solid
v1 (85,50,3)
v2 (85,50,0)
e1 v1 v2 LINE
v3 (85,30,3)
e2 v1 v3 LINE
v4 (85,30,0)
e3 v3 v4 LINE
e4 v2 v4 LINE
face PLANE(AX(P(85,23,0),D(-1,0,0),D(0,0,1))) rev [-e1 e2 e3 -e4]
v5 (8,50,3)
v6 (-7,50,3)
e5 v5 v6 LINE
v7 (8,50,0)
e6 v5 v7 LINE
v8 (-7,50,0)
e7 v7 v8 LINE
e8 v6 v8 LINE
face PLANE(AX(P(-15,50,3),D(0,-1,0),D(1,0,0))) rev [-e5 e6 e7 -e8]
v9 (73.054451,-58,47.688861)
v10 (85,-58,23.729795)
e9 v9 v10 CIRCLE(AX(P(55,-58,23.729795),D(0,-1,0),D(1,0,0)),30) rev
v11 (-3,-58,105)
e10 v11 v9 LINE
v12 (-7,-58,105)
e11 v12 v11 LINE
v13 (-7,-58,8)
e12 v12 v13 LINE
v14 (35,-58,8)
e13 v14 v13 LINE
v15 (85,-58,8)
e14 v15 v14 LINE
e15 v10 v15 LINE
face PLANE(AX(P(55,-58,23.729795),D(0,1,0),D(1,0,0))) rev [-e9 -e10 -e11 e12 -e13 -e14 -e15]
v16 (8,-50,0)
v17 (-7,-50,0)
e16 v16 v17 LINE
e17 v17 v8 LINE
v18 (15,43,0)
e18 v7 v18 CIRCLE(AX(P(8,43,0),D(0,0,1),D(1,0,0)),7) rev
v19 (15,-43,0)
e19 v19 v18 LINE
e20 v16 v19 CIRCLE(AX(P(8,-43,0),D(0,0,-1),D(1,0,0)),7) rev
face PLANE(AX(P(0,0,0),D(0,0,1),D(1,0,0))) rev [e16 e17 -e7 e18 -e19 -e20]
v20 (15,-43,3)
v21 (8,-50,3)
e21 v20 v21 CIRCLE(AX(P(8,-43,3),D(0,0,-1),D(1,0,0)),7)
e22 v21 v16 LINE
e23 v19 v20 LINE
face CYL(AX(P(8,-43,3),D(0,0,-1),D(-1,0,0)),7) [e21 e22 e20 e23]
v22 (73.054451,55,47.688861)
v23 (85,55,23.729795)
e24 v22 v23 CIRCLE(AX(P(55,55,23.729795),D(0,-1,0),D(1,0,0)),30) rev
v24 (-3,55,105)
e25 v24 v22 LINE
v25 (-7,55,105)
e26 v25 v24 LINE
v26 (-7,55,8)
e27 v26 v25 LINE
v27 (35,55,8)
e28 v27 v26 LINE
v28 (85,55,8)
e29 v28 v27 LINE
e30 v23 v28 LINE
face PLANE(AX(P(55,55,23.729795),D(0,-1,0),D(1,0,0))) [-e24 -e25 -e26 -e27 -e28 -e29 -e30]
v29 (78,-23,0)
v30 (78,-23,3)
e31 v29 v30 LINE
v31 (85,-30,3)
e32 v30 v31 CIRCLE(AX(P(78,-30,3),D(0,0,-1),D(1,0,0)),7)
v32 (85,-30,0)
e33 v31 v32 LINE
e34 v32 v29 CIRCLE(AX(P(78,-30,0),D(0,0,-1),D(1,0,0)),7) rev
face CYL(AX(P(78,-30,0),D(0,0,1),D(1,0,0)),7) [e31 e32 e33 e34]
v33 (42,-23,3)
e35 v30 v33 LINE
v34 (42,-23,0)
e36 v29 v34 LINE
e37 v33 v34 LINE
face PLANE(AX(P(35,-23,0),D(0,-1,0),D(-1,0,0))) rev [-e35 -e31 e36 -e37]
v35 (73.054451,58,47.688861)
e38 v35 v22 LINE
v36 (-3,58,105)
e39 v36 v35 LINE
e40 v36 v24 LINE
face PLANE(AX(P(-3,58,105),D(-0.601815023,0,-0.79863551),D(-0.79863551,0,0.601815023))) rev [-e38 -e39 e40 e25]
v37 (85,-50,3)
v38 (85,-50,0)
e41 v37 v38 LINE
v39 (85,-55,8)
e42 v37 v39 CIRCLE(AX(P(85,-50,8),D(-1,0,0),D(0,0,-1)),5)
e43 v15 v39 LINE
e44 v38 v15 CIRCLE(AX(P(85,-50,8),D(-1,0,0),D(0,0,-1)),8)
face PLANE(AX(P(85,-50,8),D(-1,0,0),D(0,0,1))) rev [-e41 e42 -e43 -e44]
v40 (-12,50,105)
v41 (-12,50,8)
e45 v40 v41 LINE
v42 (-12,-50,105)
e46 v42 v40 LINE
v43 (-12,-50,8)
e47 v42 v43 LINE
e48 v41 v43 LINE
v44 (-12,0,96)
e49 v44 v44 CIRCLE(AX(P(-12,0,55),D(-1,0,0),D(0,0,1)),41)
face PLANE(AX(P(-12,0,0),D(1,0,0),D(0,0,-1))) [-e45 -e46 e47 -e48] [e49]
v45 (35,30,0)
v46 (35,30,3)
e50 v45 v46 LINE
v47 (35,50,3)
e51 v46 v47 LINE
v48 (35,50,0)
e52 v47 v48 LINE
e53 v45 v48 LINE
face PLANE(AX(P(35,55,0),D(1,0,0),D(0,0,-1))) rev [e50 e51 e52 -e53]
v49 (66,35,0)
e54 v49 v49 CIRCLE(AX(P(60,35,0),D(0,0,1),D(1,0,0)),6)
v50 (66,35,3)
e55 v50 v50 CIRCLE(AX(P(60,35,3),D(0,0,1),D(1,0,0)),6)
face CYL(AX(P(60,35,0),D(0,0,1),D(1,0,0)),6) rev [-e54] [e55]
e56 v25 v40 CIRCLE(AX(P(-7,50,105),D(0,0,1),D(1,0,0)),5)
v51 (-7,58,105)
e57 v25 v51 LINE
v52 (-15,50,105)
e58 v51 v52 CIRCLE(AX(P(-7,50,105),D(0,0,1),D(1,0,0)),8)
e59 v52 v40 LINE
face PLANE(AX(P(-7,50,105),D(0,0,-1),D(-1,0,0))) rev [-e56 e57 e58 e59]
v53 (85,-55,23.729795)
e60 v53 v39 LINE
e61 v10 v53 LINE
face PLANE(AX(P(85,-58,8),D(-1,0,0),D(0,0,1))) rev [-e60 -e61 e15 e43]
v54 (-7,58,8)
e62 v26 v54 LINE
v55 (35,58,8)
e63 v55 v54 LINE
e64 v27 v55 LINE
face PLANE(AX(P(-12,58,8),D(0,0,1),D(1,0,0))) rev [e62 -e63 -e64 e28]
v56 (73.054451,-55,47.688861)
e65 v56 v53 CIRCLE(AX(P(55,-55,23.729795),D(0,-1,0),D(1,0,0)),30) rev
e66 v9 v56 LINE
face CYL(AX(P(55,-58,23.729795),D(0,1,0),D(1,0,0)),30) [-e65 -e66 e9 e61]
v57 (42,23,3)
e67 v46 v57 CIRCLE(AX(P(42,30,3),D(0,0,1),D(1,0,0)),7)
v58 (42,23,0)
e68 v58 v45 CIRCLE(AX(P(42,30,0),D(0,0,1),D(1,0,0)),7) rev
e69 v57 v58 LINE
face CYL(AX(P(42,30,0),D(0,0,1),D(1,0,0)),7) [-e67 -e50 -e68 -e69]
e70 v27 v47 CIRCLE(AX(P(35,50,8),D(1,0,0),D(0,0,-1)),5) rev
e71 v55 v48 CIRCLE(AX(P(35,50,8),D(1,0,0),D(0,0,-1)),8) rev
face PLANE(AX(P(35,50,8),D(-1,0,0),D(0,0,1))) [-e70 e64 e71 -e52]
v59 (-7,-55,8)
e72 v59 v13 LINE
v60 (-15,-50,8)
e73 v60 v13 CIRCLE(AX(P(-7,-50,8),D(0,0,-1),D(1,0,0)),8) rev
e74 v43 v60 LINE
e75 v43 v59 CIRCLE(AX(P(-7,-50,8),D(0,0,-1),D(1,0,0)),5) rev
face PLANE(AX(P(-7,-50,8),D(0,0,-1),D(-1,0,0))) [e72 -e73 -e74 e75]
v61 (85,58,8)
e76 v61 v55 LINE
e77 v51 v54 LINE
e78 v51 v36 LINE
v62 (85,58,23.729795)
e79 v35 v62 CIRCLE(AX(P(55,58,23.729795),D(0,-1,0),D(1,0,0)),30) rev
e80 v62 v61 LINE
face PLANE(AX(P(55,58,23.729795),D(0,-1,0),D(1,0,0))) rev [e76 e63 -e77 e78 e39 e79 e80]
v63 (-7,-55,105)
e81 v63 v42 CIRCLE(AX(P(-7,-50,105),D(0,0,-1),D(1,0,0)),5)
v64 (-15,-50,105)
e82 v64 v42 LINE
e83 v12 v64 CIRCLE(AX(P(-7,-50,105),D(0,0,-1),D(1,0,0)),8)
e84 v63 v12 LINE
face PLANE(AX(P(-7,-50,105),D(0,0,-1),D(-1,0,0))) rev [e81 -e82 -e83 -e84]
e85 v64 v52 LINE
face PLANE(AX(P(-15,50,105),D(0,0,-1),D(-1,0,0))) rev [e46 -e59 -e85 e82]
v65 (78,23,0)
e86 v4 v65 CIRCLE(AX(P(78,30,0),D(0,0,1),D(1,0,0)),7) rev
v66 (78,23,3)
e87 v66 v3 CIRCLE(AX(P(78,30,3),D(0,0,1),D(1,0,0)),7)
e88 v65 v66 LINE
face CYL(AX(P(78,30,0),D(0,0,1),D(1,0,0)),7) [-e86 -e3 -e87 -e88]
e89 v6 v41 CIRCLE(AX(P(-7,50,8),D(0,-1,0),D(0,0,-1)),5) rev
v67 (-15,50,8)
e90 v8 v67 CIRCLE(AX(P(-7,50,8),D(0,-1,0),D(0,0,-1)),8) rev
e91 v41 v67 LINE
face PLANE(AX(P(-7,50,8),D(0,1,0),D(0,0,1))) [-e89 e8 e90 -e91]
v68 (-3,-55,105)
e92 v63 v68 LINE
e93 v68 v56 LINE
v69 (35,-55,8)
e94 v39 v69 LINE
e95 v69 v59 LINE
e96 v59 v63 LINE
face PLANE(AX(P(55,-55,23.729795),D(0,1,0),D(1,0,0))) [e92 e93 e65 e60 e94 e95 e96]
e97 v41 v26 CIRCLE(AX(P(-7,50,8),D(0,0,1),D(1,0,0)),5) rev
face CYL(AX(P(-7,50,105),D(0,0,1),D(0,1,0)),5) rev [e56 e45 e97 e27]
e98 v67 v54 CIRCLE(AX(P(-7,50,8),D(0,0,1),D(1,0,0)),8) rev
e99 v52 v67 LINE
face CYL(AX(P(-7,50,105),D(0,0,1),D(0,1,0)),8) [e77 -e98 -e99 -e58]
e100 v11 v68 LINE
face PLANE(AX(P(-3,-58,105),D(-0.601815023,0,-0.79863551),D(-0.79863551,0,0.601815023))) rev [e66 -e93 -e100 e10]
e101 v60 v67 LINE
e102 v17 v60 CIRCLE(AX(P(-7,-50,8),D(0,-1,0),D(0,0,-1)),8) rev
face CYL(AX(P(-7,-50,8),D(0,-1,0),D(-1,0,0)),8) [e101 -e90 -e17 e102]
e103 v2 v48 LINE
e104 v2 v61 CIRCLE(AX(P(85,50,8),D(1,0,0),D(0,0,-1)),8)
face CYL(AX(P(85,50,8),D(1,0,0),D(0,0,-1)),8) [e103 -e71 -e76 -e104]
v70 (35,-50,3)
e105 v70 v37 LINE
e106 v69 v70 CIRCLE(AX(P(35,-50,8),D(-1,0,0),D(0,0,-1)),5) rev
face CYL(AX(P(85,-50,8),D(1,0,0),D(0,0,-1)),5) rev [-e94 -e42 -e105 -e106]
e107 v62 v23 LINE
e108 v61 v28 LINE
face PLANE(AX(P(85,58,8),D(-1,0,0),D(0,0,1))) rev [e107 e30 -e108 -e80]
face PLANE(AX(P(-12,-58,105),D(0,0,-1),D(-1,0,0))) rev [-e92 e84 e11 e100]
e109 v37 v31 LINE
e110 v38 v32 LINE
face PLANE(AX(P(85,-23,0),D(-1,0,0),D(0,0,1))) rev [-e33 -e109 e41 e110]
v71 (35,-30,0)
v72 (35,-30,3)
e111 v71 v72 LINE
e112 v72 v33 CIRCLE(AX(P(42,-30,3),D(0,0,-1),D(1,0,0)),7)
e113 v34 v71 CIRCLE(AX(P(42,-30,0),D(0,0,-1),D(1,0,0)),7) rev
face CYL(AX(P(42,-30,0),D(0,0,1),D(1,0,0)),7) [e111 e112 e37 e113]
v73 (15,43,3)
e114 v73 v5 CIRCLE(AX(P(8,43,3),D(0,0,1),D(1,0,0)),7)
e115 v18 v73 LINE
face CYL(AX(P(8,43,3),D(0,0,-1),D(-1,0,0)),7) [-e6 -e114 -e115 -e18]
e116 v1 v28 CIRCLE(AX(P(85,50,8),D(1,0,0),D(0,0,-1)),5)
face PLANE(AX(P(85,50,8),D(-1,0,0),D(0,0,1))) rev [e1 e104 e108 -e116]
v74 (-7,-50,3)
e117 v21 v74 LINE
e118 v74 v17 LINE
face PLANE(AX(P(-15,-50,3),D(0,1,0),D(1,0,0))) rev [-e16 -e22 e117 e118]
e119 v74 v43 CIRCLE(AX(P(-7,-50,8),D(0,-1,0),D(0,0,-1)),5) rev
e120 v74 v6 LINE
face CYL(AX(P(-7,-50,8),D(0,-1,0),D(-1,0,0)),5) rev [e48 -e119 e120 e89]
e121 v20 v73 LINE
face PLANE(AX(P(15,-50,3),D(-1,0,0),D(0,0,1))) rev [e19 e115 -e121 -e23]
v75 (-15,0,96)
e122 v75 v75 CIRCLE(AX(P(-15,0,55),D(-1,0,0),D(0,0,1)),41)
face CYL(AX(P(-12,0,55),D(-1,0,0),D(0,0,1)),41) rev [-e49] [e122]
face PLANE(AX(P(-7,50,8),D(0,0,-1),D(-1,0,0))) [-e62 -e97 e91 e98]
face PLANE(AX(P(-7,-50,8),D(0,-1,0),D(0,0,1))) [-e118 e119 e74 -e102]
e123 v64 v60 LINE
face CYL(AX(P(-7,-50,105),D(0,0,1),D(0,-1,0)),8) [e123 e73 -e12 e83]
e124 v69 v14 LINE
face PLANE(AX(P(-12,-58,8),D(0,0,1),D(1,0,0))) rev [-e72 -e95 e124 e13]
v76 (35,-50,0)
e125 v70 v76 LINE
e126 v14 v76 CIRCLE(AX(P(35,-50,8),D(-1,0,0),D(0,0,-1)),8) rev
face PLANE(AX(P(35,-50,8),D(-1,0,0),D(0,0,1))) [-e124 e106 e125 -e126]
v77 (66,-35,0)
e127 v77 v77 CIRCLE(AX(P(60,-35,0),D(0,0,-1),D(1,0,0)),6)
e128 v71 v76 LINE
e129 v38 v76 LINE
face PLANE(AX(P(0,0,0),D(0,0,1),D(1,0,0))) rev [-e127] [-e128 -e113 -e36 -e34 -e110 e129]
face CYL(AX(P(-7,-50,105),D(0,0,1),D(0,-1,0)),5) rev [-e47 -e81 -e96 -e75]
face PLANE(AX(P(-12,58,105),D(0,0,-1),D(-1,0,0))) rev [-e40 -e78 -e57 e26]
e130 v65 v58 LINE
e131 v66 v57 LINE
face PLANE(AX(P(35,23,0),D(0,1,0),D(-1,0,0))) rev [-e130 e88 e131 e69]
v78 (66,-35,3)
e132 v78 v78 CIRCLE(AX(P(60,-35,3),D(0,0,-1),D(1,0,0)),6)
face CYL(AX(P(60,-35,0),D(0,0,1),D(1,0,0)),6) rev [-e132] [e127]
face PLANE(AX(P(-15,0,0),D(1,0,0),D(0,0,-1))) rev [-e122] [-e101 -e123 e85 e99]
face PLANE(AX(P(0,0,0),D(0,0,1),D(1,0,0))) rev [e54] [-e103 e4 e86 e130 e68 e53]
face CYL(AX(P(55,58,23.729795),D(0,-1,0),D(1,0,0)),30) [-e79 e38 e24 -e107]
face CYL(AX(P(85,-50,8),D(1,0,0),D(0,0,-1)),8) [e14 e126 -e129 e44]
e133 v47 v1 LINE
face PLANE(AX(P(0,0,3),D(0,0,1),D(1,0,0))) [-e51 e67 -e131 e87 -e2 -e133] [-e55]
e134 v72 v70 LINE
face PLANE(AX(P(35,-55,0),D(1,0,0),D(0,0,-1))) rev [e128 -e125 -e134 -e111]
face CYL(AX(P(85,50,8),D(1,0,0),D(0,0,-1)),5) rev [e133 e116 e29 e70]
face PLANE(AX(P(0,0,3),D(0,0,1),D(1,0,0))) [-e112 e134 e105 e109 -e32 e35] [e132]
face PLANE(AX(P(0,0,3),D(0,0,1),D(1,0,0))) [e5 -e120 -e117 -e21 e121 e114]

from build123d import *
from build123d.topology import SkipClean

# Parameters (mm, degrees)
SKETCH1_W                    = 100
SKETCH1_H                    = 30
BASE_FLANGE1_DEPTH           = 3
EDGE_FLANGE1_STRIP_W         = 22
EDGE_FLANGE1_STRIP_H         = 3
EDGE_FLANGE1_STRIP_CUT_DEPTH = 100
EDGE_FLANGE1_DEPTH           = 100
EDGE_FLANGE2_DEPTH           = 97
EDGE_FLANGE2_START           = 3
EDGE_FLANGE2_FLAT_DEPTH      = 3
EDGE_FLANGE3_DEPTH           = 50
SKETCH16_R                   = 6
CUT_EXTRUDE1_DEPTH           = 10
SKETCH17_R                   = 41
CUT_EXTRUDE2_DEPTH           = 10
FILLET1_R                    = 7


# Sheet-metal steps are written as plain solids
with BuildPart() as part:
    # Sketch1 → Base-Flange1 (new body)
    with BuildSketch(Plane(origin=(0, 0, 0), x_dir=(0, 1, 0), z_dir=(0, 0, 1))):
        Rectangle(SKETCH1_W, SKETCH1_H)
    extrude(amount=BASE_FLANGE1_DEPTH)

    # Edge-Flange1 strip (across the edge) → Edge-Flange1 strip cut (cut)
    with BuildSketch(Plane(origin=(-15, 50, 3), x_dir=(1, 0, 0), z_dir=(0, -1, 0))):
        with Locations((-3, -1.5)):
            Rectangle(EDGE_FLANGE1_STRIP_W, EDGE_FLANGE1_STRIP_H)
    extrude(amount=EDGE_FLANGE1_STRIP_CUT_DEPTH, mode=Mode.SUBTRACT)

    # Edge-Flange1 section (across the edge) → Edge-Flange1 (add)
    with BuildSketch(Plane(origin=(-15, 50, 3), x_dir=(1, 0, 0), z_dir=(0, -1, 0))):
        with BuildLine():
            Line((0, 5), (0, 102))
            Line((0, 102), (3, 102))
            Line((3, 102), (3, 5))
            ThreePointArc((3, 5), (4.464466094, 1.464466094), (8, 0))
            Line((8, 0), (8, -3))
            ThreePointArc((8, -3), (2.343145751, -0.656854249), (0, 5))
        make_face()
    extrude(amount=EDGE_FLANGE1_DEPTH)

    # Edge-Flange2 bend section (across the edge) → Edge-Flange2 (add)
    with BuildSketch(Plane(origin=(-12, 55, 8), x_dir=(0, -1, 0), z_dir=(0, 0, 1))):
        with BuildLine():
            Line((-3, 5), (0, 5))
            ThreePointArc((0, 5), (1.464466094, 1.464466094), (5, 0))
            Line((5, 0), (5, -3))
            ThreePointArc((5, -3), (-0.656854249, -0.656854249), (-3, 5))
        make_face()
    extrude(amount=EDGE_FLANGE2_DEPTH)

    # Edge-Flange2 profile (on flange) → Edge-Flange2 flat (add)
    with BuildSketch(Plane(origin=(-12, 55, 0), x_dir=(0, 0, 1), z_dir=(0, 1, 0)).offset(EDGE_FLANGE2_START)):
        with BuildLine():
            Line((8, 5), (105, 5))
            Line((105, 5), (105, 9))
            Line((105, 9), (47.688860651, 85.054450695))
            ThreePointArc((47.688860651, 85.054450695), (37.115729743, 93.848030848), (23.729795349, 97))
            Line((23.729795349, 97), (8, 97))
            Line((8, 97), (8, 5))
        make_face()
    extrude(amount=-EDGE_FLANGE2_FLAT_DEPTH)

    # Edge-Flange3 section (across the edge) → Edge-Flange3 (add)
    with BuildSketch(Plane(origin=(35, 55, 3), x_dir=(0, 0, 1), z_dir=(1, 0, 0))):
        with BuildLine():
            Line((-3, 5), (-3, 32))
            Line((-3, 32), (0, 32))
            Line((0, 32), (0, 5))
            ThreePointArc((0, 5), (1.464466094, 1.464466094), (5, 0))
            Line((5, 0), (5, -3))
            ThreePointArc((5, -3), (-0.656854249, -0.656854249), (-3, 5))
        make_face()
    extrude(amount=EDGE_FLANGE3_DEPTH)

    # Sketch16 → Cut-Extrude1 (cut)
    with BuildSketch(Plane.XY.offset(3)):
        with Locations((60, 35)):
            Circle(SKETCH16_R)
    extrude(amount=-CUT_EXTRUDE1_DEPTH, mode=Mode.SUBTRACT)

    # Sketch17 → Cut-Extrude2 (cut)
    with BuildSketch(Plane(origin=(-15, 0, 0), x_dir=(0, -1, 0), z_dir=(-1, 0, 0))):
        with Locations(Location((0, 55, 0), (0, 0, 90))):
            Circle(SKETCH17_R)
    extrude(amount=-CUT_EXTRUDE2_DEPTH, mode=Mode.SUBTRACT)

    # Fillet1
    fillet1_edges = [part.edges().sort_by_distance(p)[0] for p in [
        (15, 50, 1.5),
        (35, 23, 1.5),
        (85, 23, 1.5),
    ]]
    fillet(fillet1_edges, radius=FILLET1_R)

    # SurfaceCut1
    split(bisect_by=Plane(origin=(0, 0, 0), x_dir=(-1, 0, 0), z_dir=(0, 1, 0)), keep=Keep.TOP)

    # Mirror2: part across plane


with BuildPart() as part_1:
    with SkipClean():  # the faces are left unmerged after this step: merging them gives an invalid solid
        add(part.part)
        add(part.part.mirror(Plane.ZX))

    # SurfaceCut2
    split(bisect_by=Plane(origin=(0, 0, 0), x_dir=(-1, 0, 0), z_dir=(0, 1, 0)), keep=Keep.TOP)

    # Mirror3: part across plane


with BuildPart() as part_2:
    with SkipClean():  # the faces are left unmerged after this step: merging them gives an invalid solid
        add(part_1.part)
        add(part_1.part.mirror(Plane.ZX))


solid = part_2.part
